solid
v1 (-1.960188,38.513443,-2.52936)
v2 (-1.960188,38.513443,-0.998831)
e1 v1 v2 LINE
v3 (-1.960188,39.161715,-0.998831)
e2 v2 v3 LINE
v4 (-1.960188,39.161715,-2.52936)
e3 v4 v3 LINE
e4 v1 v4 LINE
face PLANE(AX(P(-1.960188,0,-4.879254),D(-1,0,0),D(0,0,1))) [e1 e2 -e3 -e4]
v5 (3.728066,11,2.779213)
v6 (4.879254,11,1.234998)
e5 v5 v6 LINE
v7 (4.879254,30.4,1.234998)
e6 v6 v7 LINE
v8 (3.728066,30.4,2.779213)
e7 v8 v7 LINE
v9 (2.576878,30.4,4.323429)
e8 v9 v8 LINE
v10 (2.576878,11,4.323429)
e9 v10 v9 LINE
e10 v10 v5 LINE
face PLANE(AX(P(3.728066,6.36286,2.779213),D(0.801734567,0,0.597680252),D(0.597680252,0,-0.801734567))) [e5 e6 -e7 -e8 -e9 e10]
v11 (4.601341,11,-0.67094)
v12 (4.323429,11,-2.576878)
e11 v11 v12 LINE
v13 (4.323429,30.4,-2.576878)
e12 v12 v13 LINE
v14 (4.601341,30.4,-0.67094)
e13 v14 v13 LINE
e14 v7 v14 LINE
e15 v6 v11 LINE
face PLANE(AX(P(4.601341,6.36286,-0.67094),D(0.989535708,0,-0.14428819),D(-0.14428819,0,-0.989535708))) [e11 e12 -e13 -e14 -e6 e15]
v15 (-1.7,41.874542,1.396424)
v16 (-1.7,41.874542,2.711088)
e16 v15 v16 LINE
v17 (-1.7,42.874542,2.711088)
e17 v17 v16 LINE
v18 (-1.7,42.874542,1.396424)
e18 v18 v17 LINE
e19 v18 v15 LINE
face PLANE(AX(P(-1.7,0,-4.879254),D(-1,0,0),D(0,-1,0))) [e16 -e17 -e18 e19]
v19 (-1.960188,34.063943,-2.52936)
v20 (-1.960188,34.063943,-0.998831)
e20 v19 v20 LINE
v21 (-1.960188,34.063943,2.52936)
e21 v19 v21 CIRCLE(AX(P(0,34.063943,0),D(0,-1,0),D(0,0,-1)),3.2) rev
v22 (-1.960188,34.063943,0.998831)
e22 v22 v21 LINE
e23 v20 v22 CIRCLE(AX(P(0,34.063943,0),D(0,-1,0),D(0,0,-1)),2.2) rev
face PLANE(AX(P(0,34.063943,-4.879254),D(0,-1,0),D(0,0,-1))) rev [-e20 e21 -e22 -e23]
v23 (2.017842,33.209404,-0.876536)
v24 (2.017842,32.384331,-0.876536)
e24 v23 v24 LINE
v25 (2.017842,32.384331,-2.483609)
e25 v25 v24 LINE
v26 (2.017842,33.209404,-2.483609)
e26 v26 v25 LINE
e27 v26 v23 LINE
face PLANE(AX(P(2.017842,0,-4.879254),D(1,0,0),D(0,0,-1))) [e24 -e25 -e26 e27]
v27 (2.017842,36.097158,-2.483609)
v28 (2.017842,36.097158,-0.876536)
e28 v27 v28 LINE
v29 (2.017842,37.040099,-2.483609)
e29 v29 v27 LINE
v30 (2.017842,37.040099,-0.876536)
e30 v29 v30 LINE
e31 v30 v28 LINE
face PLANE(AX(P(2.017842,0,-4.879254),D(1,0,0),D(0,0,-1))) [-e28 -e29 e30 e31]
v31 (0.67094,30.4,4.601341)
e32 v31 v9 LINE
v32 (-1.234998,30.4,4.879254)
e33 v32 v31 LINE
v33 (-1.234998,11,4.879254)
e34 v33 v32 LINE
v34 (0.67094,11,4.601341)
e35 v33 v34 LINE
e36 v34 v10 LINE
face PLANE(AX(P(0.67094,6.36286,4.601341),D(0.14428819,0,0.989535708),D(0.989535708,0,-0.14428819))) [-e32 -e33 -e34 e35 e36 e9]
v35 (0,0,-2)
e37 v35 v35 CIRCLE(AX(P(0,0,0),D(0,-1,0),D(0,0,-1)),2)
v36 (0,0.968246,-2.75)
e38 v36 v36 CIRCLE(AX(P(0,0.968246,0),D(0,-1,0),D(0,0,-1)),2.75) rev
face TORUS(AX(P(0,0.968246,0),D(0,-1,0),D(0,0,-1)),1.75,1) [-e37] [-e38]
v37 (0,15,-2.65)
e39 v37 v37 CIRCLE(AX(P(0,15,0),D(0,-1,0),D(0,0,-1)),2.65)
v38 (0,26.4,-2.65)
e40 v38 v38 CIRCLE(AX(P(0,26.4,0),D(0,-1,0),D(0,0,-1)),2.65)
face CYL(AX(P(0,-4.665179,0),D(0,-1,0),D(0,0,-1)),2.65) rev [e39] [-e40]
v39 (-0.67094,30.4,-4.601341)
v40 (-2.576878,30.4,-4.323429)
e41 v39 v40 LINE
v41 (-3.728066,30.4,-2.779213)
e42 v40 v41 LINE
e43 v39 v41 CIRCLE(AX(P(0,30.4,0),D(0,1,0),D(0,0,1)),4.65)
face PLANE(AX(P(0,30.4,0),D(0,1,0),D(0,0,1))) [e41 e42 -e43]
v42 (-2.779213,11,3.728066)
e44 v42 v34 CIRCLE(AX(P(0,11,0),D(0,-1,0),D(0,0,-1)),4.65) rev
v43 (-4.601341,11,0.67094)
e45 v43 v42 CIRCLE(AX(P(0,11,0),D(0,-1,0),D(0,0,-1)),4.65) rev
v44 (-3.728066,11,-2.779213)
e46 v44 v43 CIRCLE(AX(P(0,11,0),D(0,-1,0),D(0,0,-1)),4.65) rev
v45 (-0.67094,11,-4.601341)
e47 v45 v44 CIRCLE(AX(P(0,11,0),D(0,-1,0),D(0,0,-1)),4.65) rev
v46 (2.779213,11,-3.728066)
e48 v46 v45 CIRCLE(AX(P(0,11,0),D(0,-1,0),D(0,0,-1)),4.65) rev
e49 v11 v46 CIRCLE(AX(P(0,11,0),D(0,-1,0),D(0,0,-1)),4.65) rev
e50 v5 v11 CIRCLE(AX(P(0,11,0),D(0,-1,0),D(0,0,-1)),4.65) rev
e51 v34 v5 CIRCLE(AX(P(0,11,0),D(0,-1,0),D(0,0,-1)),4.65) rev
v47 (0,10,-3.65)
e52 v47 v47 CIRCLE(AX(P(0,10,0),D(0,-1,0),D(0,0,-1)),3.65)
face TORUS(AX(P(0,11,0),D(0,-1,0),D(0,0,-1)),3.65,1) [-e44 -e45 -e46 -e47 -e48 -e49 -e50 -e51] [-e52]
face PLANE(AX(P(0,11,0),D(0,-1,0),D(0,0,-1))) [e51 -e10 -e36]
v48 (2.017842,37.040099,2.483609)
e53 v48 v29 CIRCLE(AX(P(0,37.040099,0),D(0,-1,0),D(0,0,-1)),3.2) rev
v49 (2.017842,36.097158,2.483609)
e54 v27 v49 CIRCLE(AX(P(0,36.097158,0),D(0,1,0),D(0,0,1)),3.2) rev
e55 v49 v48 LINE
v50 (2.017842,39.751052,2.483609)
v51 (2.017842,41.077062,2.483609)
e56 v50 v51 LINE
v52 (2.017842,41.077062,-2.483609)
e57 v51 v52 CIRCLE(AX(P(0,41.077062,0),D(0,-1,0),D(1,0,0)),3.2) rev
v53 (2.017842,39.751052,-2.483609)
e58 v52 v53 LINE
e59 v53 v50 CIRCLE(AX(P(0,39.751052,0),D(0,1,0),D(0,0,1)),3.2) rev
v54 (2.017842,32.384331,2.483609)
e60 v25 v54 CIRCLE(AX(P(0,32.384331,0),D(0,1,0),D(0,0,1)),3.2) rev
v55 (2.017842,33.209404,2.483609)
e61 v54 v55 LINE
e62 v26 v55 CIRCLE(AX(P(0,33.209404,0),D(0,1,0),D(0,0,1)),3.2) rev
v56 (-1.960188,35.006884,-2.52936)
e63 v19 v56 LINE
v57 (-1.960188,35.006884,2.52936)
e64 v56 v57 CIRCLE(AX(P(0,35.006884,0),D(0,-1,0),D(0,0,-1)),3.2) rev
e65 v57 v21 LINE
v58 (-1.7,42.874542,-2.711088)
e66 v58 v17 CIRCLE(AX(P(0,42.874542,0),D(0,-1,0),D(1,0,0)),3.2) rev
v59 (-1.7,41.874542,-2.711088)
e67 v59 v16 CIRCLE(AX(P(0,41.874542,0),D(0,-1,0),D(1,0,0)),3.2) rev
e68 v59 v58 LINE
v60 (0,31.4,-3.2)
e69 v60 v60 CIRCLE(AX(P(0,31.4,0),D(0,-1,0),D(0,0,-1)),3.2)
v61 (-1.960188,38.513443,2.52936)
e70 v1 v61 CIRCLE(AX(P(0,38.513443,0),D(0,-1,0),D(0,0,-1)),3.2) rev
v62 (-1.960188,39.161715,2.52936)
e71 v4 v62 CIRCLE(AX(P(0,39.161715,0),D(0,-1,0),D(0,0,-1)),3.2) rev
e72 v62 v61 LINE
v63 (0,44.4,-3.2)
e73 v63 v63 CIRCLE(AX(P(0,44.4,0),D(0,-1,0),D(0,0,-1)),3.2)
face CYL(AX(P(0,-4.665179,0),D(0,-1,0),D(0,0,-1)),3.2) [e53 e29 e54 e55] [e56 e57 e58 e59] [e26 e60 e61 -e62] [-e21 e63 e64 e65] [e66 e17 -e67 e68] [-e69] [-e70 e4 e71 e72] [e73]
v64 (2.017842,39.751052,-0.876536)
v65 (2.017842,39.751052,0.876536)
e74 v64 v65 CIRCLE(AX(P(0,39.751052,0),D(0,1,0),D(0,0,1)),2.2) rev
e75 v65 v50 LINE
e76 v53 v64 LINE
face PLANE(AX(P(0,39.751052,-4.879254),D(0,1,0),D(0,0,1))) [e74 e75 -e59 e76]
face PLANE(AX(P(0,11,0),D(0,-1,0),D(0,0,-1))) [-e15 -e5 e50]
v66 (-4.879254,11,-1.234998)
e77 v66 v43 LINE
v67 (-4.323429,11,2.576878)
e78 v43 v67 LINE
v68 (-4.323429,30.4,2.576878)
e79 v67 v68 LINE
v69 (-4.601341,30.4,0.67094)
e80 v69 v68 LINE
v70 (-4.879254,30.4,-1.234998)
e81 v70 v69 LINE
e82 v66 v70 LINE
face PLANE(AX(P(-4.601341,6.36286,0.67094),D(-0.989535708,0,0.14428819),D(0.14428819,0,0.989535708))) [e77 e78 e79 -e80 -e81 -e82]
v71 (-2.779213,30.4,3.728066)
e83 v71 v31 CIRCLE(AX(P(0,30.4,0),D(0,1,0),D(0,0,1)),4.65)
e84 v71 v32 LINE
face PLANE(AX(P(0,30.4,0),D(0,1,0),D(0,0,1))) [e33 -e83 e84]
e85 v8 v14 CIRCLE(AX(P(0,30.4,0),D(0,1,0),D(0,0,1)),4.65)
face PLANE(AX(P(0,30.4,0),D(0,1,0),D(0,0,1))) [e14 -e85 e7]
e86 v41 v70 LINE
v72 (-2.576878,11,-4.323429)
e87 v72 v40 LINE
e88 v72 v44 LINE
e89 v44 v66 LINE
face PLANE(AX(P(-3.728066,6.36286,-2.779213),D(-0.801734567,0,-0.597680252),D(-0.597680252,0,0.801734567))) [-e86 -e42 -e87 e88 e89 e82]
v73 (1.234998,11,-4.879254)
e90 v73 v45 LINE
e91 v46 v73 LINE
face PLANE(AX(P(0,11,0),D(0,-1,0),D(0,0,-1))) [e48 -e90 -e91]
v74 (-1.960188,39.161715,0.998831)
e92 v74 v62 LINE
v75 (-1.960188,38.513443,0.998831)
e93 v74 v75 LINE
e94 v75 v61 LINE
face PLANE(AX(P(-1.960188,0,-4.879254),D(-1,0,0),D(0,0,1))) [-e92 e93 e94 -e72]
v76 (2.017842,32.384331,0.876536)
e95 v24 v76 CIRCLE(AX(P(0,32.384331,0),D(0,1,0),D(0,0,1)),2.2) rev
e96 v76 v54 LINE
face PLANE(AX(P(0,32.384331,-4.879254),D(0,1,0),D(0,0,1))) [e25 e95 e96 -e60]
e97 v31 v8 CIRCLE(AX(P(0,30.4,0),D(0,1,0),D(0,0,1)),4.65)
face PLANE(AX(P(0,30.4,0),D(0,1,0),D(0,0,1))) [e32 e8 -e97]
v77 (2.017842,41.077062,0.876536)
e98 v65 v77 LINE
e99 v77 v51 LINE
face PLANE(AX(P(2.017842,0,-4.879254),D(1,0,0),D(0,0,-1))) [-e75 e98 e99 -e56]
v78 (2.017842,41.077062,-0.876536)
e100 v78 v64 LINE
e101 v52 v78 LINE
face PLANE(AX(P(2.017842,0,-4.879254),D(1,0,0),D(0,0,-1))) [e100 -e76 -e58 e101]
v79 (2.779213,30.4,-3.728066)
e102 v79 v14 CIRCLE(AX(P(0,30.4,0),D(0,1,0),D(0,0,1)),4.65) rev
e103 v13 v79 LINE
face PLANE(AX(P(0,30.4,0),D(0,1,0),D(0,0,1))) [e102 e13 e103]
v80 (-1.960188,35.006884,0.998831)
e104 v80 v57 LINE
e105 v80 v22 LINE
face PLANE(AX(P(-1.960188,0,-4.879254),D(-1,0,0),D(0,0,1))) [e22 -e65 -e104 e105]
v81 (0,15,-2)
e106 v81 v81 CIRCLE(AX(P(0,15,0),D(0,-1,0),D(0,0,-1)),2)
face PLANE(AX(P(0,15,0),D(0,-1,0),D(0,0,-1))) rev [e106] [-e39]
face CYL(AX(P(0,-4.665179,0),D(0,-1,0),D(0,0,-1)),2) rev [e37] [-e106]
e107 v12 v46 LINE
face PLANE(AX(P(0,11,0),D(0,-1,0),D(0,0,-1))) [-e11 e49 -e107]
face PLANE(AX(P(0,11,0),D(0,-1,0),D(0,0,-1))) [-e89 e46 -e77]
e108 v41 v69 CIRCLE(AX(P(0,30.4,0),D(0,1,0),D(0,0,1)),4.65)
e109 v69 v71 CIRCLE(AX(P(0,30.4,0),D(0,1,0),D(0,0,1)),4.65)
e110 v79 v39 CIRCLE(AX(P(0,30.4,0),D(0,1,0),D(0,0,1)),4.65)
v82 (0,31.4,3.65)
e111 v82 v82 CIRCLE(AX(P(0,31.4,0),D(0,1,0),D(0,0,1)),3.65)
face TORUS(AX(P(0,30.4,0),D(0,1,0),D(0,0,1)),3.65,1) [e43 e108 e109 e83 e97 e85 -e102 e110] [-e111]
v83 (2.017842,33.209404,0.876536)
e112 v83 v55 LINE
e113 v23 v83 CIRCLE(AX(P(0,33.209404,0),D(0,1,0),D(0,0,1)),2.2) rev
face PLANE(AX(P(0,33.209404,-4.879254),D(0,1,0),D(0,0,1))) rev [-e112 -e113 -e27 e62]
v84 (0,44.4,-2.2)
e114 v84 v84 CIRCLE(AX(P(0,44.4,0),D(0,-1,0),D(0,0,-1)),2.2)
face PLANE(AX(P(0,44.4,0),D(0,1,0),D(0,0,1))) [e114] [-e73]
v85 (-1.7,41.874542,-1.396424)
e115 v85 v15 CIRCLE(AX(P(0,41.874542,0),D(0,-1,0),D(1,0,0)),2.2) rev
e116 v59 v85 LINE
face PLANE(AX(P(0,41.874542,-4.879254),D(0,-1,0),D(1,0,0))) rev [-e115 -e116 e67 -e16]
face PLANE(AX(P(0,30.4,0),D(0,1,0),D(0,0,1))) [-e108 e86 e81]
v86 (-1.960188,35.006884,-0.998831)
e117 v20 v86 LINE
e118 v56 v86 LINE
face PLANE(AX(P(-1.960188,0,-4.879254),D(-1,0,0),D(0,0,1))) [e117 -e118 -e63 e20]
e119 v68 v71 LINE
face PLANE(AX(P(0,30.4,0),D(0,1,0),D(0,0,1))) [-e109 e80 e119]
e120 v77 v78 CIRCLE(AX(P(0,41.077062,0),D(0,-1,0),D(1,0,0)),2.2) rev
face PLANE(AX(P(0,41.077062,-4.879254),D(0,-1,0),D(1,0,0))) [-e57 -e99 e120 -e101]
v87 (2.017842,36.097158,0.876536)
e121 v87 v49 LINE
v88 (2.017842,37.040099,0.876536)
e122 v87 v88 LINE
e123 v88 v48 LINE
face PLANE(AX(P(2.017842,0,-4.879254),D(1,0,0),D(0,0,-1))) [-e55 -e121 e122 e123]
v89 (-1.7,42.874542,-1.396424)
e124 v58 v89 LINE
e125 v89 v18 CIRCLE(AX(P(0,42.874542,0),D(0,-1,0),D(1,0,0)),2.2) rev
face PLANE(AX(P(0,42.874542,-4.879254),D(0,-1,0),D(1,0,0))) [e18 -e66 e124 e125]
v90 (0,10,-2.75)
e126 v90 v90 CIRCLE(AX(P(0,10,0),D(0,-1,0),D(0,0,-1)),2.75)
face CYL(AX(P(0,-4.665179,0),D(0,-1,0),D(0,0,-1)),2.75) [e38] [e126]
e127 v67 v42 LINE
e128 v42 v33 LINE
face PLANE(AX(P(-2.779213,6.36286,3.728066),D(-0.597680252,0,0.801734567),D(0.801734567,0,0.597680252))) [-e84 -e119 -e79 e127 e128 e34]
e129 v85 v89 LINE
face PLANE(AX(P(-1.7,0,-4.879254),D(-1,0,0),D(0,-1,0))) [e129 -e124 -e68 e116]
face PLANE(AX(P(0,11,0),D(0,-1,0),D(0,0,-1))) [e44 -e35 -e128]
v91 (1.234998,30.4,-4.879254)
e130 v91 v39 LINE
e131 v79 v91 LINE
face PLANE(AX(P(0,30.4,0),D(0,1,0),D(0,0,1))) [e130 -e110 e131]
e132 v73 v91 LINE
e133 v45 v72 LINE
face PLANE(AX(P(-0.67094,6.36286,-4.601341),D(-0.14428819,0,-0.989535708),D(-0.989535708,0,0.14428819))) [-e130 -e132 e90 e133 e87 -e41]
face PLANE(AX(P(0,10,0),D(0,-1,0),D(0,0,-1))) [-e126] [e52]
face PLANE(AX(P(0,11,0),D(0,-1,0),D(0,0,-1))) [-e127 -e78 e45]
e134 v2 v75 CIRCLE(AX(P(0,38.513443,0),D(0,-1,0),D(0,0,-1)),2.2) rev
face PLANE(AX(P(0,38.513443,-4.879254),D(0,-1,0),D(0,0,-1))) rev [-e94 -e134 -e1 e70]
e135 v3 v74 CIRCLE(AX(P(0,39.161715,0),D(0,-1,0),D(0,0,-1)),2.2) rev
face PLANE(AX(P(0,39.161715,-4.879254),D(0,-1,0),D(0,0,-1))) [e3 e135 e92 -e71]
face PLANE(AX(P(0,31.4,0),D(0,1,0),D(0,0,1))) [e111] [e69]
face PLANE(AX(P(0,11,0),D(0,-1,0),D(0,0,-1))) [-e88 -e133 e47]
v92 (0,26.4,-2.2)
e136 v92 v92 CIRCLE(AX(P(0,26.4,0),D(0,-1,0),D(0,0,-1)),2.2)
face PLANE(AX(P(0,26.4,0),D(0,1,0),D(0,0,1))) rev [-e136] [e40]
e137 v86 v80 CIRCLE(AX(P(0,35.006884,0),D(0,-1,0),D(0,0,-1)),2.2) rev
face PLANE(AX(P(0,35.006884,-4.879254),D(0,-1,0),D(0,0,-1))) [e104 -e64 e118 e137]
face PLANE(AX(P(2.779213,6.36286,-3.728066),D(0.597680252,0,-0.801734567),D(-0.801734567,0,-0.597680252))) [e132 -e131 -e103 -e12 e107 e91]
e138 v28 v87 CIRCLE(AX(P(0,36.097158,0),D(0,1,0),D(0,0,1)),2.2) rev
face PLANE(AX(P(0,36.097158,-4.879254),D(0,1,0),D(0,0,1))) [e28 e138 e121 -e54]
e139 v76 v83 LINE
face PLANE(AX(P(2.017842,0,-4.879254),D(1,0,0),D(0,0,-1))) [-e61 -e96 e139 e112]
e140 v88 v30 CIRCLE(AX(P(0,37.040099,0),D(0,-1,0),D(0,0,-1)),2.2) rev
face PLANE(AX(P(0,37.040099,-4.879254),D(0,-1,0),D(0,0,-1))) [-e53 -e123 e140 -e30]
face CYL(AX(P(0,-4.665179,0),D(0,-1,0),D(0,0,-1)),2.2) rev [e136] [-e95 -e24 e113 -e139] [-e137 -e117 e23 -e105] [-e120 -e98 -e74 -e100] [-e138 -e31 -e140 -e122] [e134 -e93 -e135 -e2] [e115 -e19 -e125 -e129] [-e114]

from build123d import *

# Parameters (mm, degrees)
FILLET_1_R               = 1
EXTRUDE_START            = -19.4
EXTRUDE_1_DEPTH          = 19.4
CUT_EXTRUDE_8_DEPTH      = 45.932997117
CUT_EXTRUDE_8_DEPTH_BACK = 45.932997117


with BuildPart() as part:
    # 草图1 → 旋转1 (revolve)
    with BuildSketch(Plane.XY, mode=Mode.PRIVATE) as revolve_1_sk:
        Polygon((2, 15), (2, 0), (2.75, 0), (2.75, 10), (4.65, 10), (4.65, 31.4), (3.2, 31.4), (3.2, 44.4), (2.2, 44.4), (2.2, 26.4), (2.65, 26.4), (2.65, 15), align=None)
    revolve(revolve_1_sk.sketch.rotate(Axis((0, -4.665178571, 0), (0, 1, 0)), 90), axis=Axis((0, -4.665178571, 0), (0, 1, 0)))

    # 圆角1
    # the kernel refuses this fillet: 1 mm, written as the material it takes off along each edge
    with BuildSketch(Plane(origin=(0, 31.4, 0), x_dir=(0, 0, -1), z_dir=(1, 0, 0))) as fillet_1_piece_1:
        with BuildLine():
            CenterArc((4.65 - FILLET_1_R, -FILLET_1_R), FILLET_1_R, 0, 90)
            Line((4.65 - FILLET_1_R, 0), (4.65 - FILLET_1_R, FILLET_1_R * 0.02))
            Line((4.65 - FILLET_1_R, FILLET_1_R * 0.02), (4.65 + FILLET_1_R * 0.02, FILLET_1_R * 0.02))
            Line((4.65 + FILLET_1_R * 0.02, FILLET_1_R * 0.02), (4.65 + FILLET_1_R * 0.02, -FILLET_1_R))
            Line((4.65 + FILLET_1_R * 0.02, -FILLET_1_R), (4.65, -FILLET_1_R))
        make_face()
    revolve(axis=Axis((0, 31.4, 0), (0, 1, 0)), mode=Mode.SUBTRACT)
    with BuildSketch(Plane(origin=(0, 10, 0), x_dir=(0, 0, -1), z_dir=(1, 0, 0))) as fillet_1_piece_2:
        with BuildLine():
            CenterArc((4.65 - FILLET_1_R, FILLET_1_R), FILLET_1_R, 270, 90)
            Line((4.65, FILLET_1_R), (4.65 + FILLET_1_R * 0.02, FILLET_1_R))
            Line((4.65 + FILLET_1_R * 0.02, FILLET_1_R), (4.65 + FILLET_1_R * 0.02, -FILLET_1_R * 0.02))
            Line((4.65 + FILLET_1_R * 0.02, -FILLET_1_R * 0.02), (4.65 - FILLET_1_R, -FILLET_1_R * 0.02))
            Line((4.65 - FILLET_1_R, -FILLET_1_R * 0.02), (4.65 - FILLET_1_R, 0))
        make_face()
    revolve(axis=Axis((0, 10, 0), (0, 1, 0)), mode=Mode.SUBTRACT)
    with BuildSketch(Plane(origin=(0, 0, 0), x_dir=(0, 0, -1), z_dir=(1, 0, 0))) as fillet_1_piece_3:
        with BuildLine():
            CenterArc((1.75, 0.968245837), FILLET_1_R, 284.477512186, 75.522487814)
            Line((2.75, 0.968245837), (2.77, 0.968245837))
            Line((2.77, 0.968245837), (2.77, 0))
            Line((2.77, 0), (2.75, -0.02))
            ThreePointArc((2.75, -0.02), (2.375, -0.02), (2.005, -0.019364917))
            Line((2.005, -0.019364917), (2, 0))
        make_face()
    revolve(axis=Axis((0, 0, 0), (0, 1, 0)), mode=Mode.SUBTRACT)

    # 草图2 → 凸台-拉伸1 (add)
    with BuildSketch(Plane(origin=(0, 30.4, 0), x_dir=(1, 0, 0), z_dir=(0, 1, 0)).offset(EXTRUDE_START)):
        with BuildLine():
            Line((2.779213221, 3.728065701), (1.234997781, 4.879253527))
            Line((1.234997781, 4.879253527), (-0.670940138, 4.601341036))
            ThreePointArc((-0.670940138, 4.601341036), (1.140989177, 4.507842466), (2.779213221, 3.728065701))
        make_face()
        with BuildLine():
            ThreePointArc((-3.728065726, 2.779213188), (-2.38072481, 3.99432715), (-0.670940138, 4.601341036))
            Line((-0.670940138, 4.601341036), (-2.57687795, 4.323428561))
            Line((-2.57687795, 4.323428561), (-3.728065726, 2.779213188))
        make_face()
        with BuildLine():
            Line((4.323428561, 2.57687795), (2.779213221, 3.728065701))
            ThreePointArc((2.779213221, 3.728065701), (3.994327171, 2.380724774), (4.601341042, 0.670940096))
            Line((4.601341042, 0.670940096), (4.323428561, 2.57687795))
        make_face()
        with BuildLine():
            ThreePointArc((-4.601341043, -0.67094009), (-4.507842465, 1.14098918), (-3.728065726, 2.779213188))
            Line((-3.728065726, 2.779213188), (-4.879253527, 1.234997781))
            Line((-4.879253527, 1.234997781), (-4.601341043, -0.67094009))
        make_face()
        with BuildLine():
            Line((4.879253527, -1.234997781), (4.601341042, 0.670940096))
            ThreePointArc((4.601341042, 0.670940096), (4.50784246, -1.1409892), (3.728065698, -2.779213226))
            Line((3.728065698, -2.779213226), (4.879253527, -1.234997781))
        make_face()
        with BuildLine():
            ThreePointArc((-2.779213228, -3.728065696), (-3.994327175, -2.380724768), (-4.601341043, -0.67094009))
            Line((-4.601341043, -0.67094009), (-4.323428561, -2.57687795))
            Line((-4.323428561, -2.57687795), (-2.779213228, -3.728065696))
        make_face()
        with BuildLine():
            ThreePointArc((0.670940034, -4.601341051), (-1.140989232, -4.507842452), (-2.779213228, -3.728065696))
            Line((-2.779213228, -3.728065696), (-1.234997781, -4.879253527))
            Line((-1.234997781, -4.879253527), (0.670940034, -4.601341051))
        make_face()
        with BuildLine():
            Line((2.57687795, -4.323428561), (3.728065698, -2.779213226))
            ThreePointArc((3.728065698, -2.779213226), (2.380724745, -3.994327189), (0.670940034, -4.601341051))
            Line((0.670940034, -4.601341051), (2.57687795, -4.323428561))
        make_face()
    extrude(amount=EXTRUDE_1_DEPTH)

    # 草图3 → 切除-拉伸8 (cut, two sides: drawn at the far end of the back side and taken through both)
    with BuildSketch(Plane.XY.offset(-CUT_EXTRUDE_8_DEPTH_BACK)):
        Polygon((-3.65, 42.874542092), (-3.65, 41.874542092), (-3.2, 41.874542092), (-1.7, 41.874542092), (-1.7, 42.874542092), (-3.2, 42.874542092), (-3.263750078, 42.874542092), align=None)
        Polygon((-3.65, 39.16171454), (-3.65, 38.513443063), (-3.2, 38.513443063), (-1.960187726, 38.513443063), (-1.960187726, 39.16171454), (-3.2, 39.16171454), align=None)
        Polygon((-3.65, 34.063943377), (-3.2, 34.063943377), (-1.960187726, 34.063943377), (-1.960187726, 35.006883708), (-3.2, 35.006883708), (-3.65, 35.006883708), align=None)
        Polygon((3.2, 36.097158465), (3.65, 36.097158465), (3.65, 37.040098796), (3.2, 37.040098796), (2.017841794, 37.040098796), (2.017841794, 36.097158465), align=None)
        Polygon((3.2, 39.751052247), (3.65, 39.751052247), (3.65, 41.077062087), (3.2, 41.077062087), (2.017841794, 41.077062087), (2.017841794, 39.751052247), align=None)
        Polygon((3.2, 32.384330913), (3.65, 32.384330913), (3.65, 33.209403702), (3.277688682, 33.209403702), (3.2, 33.209403702), (2.017841794, 33.209403702), (2.017841794, 32.384330913), align=None)
    extrude(amount=CUT_EXTRUDE_8_DEPTH + CUT_EXTRUDE_8_DEPTH_BACK, mode=Mode.SUBTRACT)


solid = part.part
